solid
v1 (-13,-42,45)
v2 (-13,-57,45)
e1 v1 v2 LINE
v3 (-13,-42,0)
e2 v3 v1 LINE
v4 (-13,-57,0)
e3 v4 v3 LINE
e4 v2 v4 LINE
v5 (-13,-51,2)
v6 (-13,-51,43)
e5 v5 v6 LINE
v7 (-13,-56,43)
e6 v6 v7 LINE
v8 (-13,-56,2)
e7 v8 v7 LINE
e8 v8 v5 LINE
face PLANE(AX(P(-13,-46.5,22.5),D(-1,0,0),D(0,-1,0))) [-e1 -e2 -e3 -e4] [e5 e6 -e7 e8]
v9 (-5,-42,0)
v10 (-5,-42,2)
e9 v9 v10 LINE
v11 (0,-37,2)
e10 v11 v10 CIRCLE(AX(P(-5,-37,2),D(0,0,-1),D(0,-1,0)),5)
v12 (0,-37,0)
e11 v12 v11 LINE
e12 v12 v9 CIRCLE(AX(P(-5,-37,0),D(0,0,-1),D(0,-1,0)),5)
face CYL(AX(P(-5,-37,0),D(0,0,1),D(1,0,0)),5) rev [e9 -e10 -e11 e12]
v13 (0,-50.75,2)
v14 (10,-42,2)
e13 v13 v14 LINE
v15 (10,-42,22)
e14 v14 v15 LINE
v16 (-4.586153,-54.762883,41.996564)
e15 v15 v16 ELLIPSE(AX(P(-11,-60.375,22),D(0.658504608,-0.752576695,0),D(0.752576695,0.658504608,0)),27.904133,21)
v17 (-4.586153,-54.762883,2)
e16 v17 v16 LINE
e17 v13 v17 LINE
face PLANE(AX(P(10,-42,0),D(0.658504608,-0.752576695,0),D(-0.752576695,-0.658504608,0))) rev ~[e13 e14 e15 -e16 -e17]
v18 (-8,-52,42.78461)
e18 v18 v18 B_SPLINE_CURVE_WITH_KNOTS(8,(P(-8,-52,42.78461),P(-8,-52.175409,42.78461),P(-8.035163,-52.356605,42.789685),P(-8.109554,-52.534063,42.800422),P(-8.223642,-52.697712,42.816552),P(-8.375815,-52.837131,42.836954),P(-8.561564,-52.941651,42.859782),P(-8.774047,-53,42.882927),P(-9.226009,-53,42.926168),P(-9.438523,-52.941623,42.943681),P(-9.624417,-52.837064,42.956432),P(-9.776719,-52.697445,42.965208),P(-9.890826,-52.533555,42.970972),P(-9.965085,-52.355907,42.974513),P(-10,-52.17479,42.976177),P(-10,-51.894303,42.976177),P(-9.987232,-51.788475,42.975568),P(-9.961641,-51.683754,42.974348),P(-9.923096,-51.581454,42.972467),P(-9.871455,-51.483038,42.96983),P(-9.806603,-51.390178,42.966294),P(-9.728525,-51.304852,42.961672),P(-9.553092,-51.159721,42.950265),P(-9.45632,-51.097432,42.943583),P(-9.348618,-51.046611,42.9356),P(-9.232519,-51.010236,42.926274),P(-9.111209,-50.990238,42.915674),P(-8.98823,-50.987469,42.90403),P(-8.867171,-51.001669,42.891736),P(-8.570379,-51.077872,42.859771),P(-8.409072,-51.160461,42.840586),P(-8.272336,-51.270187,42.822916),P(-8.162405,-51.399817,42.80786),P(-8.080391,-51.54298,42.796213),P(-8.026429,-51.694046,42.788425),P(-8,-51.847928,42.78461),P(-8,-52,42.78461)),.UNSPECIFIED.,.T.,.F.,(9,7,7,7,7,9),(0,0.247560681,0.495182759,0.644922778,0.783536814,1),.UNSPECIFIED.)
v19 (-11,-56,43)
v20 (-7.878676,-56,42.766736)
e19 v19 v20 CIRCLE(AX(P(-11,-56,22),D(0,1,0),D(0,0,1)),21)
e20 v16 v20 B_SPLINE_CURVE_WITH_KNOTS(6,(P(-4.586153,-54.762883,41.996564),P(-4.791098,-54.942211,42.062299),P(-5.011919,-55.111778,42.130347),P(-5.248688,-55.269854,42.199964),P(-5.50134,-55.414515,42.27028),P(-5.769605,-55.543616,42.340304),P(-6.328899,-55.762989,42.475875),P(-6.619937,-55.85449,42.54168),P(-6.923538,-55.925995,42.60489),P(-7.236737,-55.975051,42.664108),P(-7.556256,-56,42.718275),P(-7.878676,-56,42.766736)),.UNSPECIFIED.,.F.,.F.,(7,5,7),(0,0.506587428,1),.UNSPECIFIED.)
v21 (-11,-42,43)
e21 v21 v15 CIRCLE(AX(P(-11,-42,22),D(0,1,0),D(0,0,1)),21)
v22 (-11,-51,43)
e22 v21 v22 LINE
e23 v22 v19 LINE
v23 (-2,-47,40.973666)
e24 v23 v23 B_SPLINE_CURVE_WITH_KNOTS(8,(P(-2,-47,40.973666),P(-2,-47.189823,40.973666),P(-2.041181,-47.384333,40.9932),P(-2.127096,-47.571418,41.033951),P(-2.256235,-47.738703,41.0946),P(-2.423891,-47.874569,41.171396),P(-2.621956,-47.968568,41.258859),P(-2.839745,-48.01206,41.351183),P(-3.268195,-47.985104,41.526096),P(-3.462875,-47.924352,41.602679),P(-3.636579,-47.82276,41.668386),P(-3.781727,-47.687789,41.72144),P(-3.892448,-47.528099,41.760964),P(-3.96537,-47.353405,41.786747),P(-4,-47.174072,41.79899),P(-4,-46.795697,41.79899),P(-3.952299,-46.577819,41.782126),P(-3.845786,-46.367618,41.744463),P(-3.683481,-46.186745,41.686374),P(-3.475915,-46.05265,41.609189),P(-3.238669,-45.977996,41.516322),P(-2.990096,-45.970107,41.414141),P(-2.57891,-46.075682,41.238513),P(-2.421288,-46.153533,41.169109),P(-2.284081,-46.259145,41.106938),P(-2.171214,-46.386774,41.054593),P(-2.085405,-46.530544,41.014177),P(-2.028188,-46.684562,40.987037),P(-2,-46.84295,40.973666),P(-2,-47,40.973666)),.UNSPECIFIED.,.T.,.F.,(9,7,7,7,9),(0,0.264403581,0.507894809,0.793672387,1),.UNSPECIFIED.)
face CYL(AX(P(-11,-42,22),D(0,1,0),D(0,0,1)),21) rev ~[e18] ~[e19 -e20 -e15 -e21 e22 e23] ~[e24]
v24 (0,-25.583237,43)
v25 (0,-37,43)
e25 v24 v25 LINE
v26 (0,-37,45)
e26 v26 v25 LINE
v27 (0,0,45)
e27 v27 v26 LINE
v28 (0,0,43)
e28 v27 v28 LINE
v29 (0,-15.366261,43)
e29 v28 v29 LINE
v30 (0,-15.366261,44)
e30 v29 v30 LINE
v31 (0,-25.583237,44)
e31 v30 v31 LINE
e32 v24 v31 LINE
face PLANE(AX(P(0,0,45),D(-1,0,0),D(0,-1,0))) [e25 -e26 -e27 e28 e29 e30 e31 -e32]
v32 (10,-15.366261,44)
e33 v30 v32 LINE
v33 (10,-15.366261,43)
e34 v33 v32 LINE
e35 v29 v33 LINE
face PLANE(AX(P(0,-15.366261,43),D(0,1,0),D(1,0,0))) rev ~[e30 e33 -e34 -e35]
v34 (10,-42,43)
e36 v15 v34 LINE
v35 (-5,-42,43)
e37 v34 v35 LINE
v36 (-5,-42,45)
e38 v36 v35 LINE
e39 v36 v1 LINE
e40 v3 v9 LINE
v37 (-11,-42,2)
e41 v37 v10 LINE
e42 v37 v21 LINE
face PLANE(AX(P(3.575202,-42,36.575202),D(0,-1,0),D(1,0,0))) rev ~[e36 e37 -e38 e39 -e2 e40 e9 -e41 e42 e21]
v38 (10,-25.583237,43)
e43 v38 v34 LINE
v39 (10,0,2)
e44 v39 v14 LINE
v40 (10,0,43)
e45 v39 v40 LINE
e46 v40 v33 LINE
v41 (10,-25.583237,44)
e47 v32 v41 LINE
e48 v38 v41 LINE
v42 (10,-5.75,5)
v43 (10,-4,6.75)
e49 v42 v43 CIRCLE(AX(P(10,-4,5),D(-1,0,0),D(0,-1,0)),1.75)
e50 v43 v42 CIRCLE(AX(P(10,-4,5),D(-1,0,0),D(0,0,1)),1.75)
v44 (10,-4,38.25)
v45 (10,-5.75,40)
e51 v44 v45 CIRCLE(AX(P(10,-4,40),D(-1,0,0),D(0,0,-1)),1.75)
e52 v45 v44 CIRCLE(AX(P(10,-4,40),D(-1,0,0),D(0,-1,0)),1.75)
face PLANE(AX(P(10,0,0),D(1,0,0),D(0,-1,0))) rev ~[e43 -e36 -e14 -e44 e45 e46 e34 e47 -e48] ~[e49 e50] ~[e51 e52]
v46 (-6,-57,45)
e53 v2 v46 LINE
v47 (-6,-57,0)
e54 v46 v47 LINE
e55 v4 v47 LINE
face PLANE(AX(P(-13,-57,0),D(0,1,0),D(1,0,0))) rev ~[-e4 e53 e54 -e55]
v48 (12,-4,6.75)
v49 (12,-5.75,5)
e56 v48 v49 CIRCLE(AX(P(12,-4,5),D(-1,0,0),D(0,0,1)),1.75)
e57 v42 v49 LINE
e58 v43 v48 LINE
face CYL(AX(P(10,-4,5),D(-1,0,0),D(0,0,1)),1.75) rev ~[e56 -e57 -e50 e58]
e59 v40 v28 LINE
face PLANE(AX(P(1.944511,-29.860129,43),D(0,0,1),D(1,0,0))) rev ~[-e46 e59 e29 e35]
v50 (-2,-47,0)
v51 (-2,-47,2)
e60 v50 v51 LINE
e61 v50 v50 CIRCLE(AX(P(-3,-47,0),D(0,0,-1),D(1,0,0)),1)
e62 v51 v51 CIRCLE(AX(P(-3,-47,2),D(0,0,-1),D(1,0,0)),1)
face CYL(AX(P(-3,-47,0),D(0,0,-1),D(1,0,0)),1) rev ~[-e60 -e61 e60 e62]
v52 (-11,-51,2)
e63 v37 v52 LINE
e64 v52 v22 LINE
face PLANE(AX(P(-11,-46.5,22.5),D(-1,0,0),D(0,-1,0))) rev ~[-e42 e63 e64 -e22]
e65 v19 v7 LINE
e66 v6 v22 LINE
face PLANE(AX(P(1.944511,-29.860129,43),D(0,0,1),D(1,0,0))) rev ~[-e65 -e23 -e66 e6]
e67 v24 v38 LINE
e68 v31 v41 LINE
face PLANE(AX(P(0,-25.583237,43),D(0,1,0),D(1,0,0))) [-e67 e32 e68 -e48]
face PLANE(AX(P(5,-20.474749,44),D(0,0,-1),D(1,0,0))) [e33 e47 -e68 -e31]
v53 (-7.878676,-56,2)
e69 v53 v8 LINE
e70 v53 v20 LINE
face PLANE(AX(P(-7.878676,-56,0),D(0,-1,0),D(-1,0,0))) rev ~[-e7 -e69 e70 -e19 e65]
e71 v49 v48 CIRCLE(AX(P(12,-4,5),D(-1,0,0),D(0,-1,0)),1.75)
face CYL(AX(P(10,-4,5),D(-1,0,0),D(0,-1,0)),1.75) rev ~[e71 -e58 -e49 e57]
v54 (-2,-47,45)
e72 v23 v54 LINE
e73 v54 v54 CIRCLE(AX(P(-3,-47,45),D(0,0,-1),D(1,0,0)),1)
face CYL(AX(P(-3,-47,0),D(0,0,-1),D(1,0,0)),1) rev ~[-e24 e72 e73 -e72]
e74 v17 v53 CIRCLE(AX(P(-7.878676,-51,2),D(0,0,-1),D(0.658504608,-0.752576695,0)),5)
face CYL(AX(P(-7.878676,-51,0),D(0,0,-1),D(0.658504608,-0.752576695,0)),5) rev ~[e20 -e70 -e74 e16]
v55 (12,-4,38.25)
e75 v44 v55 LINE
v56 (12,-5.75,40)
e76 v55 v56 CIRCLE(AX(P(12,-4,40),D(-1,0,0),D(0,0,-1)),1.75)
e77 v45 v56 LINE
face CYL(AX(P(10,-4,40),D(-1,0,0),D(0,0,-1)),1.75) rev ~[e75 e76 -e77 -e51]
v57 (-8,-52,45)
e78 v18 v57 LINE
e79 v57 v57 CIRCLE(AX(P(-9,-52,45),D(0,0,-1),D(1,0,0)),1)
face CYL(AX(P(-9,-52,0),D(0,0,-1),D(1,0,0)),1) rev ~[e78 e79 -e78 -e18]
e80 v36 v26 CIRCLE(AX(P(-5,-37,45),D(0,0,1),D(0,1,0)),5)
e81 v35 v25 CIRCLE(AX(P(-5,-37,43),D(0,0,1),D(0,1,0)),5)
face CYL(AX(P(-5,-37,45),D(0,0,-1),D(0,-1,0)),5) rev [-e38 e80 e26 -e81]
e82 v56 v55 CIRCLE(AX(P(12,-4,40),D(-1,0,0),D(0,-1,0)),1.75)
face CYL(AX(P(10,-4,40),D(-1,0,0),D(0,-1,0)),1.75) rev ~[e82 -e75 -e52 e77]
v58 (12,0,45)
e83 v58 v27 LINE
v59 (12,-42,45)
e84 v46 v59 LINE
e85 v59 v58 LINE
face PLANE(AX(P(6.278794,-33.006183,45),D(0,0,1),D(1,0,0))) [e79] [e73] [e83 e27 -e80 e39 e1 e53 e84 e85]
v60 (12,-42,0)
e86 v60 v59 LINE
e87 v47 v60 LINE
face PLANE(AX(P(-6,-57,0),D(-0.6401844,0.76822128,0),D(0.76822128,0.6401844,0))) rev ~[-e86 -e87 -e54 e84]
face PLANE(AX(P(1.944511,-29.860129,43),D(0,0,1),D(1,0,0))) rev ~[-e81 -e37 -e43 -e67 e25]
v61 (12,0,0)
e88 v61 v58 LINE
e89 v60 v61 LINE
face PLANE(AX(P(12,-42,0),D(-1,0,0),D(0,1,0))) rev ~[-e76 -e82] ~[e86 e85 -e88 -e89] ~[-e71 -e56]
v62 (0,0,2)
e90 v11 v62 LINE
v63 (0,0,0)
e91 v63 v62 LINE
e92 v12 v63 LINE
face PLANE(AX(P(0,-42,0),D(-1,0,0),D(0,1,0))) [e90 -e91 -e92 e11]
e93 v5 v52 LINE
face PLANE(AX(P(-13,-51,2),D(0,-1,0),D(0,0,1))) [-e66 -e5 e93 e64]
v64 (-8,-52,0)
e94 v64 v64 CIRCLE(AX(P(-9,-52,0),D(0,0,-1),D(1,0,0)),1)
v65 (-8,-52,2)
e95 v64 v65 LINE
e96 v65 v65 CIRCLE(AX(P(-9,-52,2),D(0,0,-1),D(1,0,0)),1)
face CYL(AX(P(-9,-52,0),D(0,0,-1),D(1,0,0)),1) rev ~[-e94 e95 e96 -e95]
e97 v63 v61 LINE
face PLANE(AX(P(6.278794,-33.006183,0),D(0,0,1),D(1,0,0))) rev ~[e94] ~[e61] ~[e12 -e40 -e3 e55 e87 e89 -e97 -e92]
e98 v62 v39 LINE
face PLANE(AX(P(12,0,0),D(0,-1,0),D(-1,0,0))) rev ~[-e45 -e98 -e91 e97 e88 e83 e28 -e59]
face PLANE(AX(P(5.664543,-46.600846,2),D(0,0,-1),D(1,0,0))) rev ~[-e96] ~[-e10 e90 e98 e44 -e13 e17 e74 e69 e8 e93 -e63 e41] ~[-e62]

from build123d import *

# Parameters (mm, degrees)
F1_DEPTH  = 45
F3_DEPTH  = 2
F4_W      = 10
F4_H      = 42
F4_R      = 1
F5_DEPTH  = 2
F7_DEPTH  = 2
F8_R      = 5
F9_W      = 10
F9_H      = 10.2169760242
F10_DEPTH = 1
F11_W     = 9
F11_H     = 41
F12_DEPTH = 2
F16_DEPTH = 45.001


# Not quite as in the source:
# - a feature names something its author has since deleted; it is built from what else it names


with BuildPart() as f1:
    # F0 (on Top) → F1 (new body)
    with BuildSketch(Plane.XY):
        with BuildLine():
            Line((12, -42), (12, 0))
            Line((12, 0), (10, 0))
            Line((10, 0), (10, -42))
            Line((10, -42), (-4.5861525412, -54.7628834735))
            ThreePointArc((-4.5861525412, -54.7628834735), (-6.1200422145, -55.6805137201), (-7.8786755805, -56))
            Line((-7.8786755805, -56), (-13, -56))
            Line((-13, -56), (-13, -57))
            Line((-13, -57), (-6, -57))
            Line((-6, -57), (12, -42))
        make_face()
    extrude(amount=F1_DEPTH)

    # F2 (on face) → F3 (cut, through all)
    with BuildSketch(Plane(origin=(10, 0, 0), x_dir=(0, -1, 0), z_dir=(-1, 0, 0))):
        with BuildLine():
            ThreePointArc((4, 6.75), (2.7625631329, 3.7625631329), (5.75, 5))
            ThreePointArc((5.75, 5), (5.2374368671, 6.2374368671), (4, 6.75))
        make_face()
        with BuildLine():
            ThreePointArc((5.75, 40), (2.7625631329, 41.2374368671), (4, 38.25))
            ThreePointArc((4, 38.25), (5.2374368671, 38.7625631329), (5.75, 40))
        make_face()
    extrude(amount=-F3_DEPTH, mode=Mode.SUBTRACT)

    # F4 (on face) → F5 (join)
    with BuildSketch(Plane(origin=(0, 0, 0), x_dir=(1, 0, 0), z_dir=(0, 0, -1))):
        Polygon((10, 42), (12, 42), (0, 52), (0, 50.75), align=None)
        with Locations((5, 21)):
            Rectangle(F4_W, F4_H)
        Polygon((0, 42), (10, 42), (0, 50.75), align=None)
        with BuildLine():
            Line((0, 42), (0, 50.75))
            Line((0, 50.75), (-4.5861525412, 54.7628834735))
            ThreePointArc((-4.5861525412, 54.7628834735), (-6.1200422145, 55.6805137201), (-7.8786755805, 56))
            Line((-7.8786755805, 56), (-13, 56))
            Line((-13, 56), (-13, 42))
            Line((-13, 42), (0, 42))
        make_face()
        with Locations((-9, 52)):
            Circle(F4_R, mode=Mode.SUBTRACT)
        with Locations((-3, 47)):
            Circle(F4_R, mode=Mode.SUBTRACT)
        with Locations((-9, 52)):
            Circle(F4_R)
        with Locations((-3, 47)):
            Circle(F4_R)
    extrude(amount=-F5_DEPTH)

    # F6 (on face) → F7 (join)
    with BuildSketch(Plane.XY.offset(45)):
        Polygon((12, -42), (12, 0), (0, 0), (0, -42), (-13, -42), (-13, -57), (-6, -57), align=None)
    extrude(amount=-F7_DEPTH)

    # F8
    f8_edges = [f1.edges().sort_by_distance(p)[0] for p in [
        (0, -42, 44),
        (0, -42, 1),
    ]]
    fillet(f8_edges, radius=F8_R)

    # F9 (on face) → F10 (cut)
    with BuildSketch(Plane(origin=(0, 0, 43), x_dir=(1, 0, 0), z_dir=(0, 0, -1))):
        with Locations((5, 20.4747493975)):
            Rectangle(F9_W, F9_H)
    extrude(amount=-F10_DEPTH, mode=Mode.SUBTRACT)

    # F11 (on face) → F12 (join)
    with BuildSketch(Plane(origin=(-13, 0, 0), x_dir=(0, -1, 0), z_dir=(-1, 0, 0))):
        with Locations((46.5, 22.5)):
            Rectangle(F11_W, F11_H)
    extrude(amount=-F12_DEPTH)

    # F14 (on offset) → F15 (join, up to the next surface of F1)
    with BuildSketch(Plane.XZ.offset(42)):
        with BuildLine():
            ThreePointArc((-11, 43), (3.8492424049, 36.8492424049), (10, 22))
            Line((10, 22), (10, 43))
            Line((10, 43), (-11, 43))
        make_face()
    extrude(until=Until.NEXT)

    # F4 (on face) → F16 (cut, through all)
    with BuildSketch(Plane(origin=(0, 0, 0), x_dir=(1, 0, 0), z_dir=(0, 0, -1))):
        with Locations((-3, 47)):
            Circle(F4_R)
        with Locations((-9, 52)):
            Circle(F4_R)
    extrude(amount=-F16_DEPTH, mode=Mode.SUBTRACT)


solid = f1.part
